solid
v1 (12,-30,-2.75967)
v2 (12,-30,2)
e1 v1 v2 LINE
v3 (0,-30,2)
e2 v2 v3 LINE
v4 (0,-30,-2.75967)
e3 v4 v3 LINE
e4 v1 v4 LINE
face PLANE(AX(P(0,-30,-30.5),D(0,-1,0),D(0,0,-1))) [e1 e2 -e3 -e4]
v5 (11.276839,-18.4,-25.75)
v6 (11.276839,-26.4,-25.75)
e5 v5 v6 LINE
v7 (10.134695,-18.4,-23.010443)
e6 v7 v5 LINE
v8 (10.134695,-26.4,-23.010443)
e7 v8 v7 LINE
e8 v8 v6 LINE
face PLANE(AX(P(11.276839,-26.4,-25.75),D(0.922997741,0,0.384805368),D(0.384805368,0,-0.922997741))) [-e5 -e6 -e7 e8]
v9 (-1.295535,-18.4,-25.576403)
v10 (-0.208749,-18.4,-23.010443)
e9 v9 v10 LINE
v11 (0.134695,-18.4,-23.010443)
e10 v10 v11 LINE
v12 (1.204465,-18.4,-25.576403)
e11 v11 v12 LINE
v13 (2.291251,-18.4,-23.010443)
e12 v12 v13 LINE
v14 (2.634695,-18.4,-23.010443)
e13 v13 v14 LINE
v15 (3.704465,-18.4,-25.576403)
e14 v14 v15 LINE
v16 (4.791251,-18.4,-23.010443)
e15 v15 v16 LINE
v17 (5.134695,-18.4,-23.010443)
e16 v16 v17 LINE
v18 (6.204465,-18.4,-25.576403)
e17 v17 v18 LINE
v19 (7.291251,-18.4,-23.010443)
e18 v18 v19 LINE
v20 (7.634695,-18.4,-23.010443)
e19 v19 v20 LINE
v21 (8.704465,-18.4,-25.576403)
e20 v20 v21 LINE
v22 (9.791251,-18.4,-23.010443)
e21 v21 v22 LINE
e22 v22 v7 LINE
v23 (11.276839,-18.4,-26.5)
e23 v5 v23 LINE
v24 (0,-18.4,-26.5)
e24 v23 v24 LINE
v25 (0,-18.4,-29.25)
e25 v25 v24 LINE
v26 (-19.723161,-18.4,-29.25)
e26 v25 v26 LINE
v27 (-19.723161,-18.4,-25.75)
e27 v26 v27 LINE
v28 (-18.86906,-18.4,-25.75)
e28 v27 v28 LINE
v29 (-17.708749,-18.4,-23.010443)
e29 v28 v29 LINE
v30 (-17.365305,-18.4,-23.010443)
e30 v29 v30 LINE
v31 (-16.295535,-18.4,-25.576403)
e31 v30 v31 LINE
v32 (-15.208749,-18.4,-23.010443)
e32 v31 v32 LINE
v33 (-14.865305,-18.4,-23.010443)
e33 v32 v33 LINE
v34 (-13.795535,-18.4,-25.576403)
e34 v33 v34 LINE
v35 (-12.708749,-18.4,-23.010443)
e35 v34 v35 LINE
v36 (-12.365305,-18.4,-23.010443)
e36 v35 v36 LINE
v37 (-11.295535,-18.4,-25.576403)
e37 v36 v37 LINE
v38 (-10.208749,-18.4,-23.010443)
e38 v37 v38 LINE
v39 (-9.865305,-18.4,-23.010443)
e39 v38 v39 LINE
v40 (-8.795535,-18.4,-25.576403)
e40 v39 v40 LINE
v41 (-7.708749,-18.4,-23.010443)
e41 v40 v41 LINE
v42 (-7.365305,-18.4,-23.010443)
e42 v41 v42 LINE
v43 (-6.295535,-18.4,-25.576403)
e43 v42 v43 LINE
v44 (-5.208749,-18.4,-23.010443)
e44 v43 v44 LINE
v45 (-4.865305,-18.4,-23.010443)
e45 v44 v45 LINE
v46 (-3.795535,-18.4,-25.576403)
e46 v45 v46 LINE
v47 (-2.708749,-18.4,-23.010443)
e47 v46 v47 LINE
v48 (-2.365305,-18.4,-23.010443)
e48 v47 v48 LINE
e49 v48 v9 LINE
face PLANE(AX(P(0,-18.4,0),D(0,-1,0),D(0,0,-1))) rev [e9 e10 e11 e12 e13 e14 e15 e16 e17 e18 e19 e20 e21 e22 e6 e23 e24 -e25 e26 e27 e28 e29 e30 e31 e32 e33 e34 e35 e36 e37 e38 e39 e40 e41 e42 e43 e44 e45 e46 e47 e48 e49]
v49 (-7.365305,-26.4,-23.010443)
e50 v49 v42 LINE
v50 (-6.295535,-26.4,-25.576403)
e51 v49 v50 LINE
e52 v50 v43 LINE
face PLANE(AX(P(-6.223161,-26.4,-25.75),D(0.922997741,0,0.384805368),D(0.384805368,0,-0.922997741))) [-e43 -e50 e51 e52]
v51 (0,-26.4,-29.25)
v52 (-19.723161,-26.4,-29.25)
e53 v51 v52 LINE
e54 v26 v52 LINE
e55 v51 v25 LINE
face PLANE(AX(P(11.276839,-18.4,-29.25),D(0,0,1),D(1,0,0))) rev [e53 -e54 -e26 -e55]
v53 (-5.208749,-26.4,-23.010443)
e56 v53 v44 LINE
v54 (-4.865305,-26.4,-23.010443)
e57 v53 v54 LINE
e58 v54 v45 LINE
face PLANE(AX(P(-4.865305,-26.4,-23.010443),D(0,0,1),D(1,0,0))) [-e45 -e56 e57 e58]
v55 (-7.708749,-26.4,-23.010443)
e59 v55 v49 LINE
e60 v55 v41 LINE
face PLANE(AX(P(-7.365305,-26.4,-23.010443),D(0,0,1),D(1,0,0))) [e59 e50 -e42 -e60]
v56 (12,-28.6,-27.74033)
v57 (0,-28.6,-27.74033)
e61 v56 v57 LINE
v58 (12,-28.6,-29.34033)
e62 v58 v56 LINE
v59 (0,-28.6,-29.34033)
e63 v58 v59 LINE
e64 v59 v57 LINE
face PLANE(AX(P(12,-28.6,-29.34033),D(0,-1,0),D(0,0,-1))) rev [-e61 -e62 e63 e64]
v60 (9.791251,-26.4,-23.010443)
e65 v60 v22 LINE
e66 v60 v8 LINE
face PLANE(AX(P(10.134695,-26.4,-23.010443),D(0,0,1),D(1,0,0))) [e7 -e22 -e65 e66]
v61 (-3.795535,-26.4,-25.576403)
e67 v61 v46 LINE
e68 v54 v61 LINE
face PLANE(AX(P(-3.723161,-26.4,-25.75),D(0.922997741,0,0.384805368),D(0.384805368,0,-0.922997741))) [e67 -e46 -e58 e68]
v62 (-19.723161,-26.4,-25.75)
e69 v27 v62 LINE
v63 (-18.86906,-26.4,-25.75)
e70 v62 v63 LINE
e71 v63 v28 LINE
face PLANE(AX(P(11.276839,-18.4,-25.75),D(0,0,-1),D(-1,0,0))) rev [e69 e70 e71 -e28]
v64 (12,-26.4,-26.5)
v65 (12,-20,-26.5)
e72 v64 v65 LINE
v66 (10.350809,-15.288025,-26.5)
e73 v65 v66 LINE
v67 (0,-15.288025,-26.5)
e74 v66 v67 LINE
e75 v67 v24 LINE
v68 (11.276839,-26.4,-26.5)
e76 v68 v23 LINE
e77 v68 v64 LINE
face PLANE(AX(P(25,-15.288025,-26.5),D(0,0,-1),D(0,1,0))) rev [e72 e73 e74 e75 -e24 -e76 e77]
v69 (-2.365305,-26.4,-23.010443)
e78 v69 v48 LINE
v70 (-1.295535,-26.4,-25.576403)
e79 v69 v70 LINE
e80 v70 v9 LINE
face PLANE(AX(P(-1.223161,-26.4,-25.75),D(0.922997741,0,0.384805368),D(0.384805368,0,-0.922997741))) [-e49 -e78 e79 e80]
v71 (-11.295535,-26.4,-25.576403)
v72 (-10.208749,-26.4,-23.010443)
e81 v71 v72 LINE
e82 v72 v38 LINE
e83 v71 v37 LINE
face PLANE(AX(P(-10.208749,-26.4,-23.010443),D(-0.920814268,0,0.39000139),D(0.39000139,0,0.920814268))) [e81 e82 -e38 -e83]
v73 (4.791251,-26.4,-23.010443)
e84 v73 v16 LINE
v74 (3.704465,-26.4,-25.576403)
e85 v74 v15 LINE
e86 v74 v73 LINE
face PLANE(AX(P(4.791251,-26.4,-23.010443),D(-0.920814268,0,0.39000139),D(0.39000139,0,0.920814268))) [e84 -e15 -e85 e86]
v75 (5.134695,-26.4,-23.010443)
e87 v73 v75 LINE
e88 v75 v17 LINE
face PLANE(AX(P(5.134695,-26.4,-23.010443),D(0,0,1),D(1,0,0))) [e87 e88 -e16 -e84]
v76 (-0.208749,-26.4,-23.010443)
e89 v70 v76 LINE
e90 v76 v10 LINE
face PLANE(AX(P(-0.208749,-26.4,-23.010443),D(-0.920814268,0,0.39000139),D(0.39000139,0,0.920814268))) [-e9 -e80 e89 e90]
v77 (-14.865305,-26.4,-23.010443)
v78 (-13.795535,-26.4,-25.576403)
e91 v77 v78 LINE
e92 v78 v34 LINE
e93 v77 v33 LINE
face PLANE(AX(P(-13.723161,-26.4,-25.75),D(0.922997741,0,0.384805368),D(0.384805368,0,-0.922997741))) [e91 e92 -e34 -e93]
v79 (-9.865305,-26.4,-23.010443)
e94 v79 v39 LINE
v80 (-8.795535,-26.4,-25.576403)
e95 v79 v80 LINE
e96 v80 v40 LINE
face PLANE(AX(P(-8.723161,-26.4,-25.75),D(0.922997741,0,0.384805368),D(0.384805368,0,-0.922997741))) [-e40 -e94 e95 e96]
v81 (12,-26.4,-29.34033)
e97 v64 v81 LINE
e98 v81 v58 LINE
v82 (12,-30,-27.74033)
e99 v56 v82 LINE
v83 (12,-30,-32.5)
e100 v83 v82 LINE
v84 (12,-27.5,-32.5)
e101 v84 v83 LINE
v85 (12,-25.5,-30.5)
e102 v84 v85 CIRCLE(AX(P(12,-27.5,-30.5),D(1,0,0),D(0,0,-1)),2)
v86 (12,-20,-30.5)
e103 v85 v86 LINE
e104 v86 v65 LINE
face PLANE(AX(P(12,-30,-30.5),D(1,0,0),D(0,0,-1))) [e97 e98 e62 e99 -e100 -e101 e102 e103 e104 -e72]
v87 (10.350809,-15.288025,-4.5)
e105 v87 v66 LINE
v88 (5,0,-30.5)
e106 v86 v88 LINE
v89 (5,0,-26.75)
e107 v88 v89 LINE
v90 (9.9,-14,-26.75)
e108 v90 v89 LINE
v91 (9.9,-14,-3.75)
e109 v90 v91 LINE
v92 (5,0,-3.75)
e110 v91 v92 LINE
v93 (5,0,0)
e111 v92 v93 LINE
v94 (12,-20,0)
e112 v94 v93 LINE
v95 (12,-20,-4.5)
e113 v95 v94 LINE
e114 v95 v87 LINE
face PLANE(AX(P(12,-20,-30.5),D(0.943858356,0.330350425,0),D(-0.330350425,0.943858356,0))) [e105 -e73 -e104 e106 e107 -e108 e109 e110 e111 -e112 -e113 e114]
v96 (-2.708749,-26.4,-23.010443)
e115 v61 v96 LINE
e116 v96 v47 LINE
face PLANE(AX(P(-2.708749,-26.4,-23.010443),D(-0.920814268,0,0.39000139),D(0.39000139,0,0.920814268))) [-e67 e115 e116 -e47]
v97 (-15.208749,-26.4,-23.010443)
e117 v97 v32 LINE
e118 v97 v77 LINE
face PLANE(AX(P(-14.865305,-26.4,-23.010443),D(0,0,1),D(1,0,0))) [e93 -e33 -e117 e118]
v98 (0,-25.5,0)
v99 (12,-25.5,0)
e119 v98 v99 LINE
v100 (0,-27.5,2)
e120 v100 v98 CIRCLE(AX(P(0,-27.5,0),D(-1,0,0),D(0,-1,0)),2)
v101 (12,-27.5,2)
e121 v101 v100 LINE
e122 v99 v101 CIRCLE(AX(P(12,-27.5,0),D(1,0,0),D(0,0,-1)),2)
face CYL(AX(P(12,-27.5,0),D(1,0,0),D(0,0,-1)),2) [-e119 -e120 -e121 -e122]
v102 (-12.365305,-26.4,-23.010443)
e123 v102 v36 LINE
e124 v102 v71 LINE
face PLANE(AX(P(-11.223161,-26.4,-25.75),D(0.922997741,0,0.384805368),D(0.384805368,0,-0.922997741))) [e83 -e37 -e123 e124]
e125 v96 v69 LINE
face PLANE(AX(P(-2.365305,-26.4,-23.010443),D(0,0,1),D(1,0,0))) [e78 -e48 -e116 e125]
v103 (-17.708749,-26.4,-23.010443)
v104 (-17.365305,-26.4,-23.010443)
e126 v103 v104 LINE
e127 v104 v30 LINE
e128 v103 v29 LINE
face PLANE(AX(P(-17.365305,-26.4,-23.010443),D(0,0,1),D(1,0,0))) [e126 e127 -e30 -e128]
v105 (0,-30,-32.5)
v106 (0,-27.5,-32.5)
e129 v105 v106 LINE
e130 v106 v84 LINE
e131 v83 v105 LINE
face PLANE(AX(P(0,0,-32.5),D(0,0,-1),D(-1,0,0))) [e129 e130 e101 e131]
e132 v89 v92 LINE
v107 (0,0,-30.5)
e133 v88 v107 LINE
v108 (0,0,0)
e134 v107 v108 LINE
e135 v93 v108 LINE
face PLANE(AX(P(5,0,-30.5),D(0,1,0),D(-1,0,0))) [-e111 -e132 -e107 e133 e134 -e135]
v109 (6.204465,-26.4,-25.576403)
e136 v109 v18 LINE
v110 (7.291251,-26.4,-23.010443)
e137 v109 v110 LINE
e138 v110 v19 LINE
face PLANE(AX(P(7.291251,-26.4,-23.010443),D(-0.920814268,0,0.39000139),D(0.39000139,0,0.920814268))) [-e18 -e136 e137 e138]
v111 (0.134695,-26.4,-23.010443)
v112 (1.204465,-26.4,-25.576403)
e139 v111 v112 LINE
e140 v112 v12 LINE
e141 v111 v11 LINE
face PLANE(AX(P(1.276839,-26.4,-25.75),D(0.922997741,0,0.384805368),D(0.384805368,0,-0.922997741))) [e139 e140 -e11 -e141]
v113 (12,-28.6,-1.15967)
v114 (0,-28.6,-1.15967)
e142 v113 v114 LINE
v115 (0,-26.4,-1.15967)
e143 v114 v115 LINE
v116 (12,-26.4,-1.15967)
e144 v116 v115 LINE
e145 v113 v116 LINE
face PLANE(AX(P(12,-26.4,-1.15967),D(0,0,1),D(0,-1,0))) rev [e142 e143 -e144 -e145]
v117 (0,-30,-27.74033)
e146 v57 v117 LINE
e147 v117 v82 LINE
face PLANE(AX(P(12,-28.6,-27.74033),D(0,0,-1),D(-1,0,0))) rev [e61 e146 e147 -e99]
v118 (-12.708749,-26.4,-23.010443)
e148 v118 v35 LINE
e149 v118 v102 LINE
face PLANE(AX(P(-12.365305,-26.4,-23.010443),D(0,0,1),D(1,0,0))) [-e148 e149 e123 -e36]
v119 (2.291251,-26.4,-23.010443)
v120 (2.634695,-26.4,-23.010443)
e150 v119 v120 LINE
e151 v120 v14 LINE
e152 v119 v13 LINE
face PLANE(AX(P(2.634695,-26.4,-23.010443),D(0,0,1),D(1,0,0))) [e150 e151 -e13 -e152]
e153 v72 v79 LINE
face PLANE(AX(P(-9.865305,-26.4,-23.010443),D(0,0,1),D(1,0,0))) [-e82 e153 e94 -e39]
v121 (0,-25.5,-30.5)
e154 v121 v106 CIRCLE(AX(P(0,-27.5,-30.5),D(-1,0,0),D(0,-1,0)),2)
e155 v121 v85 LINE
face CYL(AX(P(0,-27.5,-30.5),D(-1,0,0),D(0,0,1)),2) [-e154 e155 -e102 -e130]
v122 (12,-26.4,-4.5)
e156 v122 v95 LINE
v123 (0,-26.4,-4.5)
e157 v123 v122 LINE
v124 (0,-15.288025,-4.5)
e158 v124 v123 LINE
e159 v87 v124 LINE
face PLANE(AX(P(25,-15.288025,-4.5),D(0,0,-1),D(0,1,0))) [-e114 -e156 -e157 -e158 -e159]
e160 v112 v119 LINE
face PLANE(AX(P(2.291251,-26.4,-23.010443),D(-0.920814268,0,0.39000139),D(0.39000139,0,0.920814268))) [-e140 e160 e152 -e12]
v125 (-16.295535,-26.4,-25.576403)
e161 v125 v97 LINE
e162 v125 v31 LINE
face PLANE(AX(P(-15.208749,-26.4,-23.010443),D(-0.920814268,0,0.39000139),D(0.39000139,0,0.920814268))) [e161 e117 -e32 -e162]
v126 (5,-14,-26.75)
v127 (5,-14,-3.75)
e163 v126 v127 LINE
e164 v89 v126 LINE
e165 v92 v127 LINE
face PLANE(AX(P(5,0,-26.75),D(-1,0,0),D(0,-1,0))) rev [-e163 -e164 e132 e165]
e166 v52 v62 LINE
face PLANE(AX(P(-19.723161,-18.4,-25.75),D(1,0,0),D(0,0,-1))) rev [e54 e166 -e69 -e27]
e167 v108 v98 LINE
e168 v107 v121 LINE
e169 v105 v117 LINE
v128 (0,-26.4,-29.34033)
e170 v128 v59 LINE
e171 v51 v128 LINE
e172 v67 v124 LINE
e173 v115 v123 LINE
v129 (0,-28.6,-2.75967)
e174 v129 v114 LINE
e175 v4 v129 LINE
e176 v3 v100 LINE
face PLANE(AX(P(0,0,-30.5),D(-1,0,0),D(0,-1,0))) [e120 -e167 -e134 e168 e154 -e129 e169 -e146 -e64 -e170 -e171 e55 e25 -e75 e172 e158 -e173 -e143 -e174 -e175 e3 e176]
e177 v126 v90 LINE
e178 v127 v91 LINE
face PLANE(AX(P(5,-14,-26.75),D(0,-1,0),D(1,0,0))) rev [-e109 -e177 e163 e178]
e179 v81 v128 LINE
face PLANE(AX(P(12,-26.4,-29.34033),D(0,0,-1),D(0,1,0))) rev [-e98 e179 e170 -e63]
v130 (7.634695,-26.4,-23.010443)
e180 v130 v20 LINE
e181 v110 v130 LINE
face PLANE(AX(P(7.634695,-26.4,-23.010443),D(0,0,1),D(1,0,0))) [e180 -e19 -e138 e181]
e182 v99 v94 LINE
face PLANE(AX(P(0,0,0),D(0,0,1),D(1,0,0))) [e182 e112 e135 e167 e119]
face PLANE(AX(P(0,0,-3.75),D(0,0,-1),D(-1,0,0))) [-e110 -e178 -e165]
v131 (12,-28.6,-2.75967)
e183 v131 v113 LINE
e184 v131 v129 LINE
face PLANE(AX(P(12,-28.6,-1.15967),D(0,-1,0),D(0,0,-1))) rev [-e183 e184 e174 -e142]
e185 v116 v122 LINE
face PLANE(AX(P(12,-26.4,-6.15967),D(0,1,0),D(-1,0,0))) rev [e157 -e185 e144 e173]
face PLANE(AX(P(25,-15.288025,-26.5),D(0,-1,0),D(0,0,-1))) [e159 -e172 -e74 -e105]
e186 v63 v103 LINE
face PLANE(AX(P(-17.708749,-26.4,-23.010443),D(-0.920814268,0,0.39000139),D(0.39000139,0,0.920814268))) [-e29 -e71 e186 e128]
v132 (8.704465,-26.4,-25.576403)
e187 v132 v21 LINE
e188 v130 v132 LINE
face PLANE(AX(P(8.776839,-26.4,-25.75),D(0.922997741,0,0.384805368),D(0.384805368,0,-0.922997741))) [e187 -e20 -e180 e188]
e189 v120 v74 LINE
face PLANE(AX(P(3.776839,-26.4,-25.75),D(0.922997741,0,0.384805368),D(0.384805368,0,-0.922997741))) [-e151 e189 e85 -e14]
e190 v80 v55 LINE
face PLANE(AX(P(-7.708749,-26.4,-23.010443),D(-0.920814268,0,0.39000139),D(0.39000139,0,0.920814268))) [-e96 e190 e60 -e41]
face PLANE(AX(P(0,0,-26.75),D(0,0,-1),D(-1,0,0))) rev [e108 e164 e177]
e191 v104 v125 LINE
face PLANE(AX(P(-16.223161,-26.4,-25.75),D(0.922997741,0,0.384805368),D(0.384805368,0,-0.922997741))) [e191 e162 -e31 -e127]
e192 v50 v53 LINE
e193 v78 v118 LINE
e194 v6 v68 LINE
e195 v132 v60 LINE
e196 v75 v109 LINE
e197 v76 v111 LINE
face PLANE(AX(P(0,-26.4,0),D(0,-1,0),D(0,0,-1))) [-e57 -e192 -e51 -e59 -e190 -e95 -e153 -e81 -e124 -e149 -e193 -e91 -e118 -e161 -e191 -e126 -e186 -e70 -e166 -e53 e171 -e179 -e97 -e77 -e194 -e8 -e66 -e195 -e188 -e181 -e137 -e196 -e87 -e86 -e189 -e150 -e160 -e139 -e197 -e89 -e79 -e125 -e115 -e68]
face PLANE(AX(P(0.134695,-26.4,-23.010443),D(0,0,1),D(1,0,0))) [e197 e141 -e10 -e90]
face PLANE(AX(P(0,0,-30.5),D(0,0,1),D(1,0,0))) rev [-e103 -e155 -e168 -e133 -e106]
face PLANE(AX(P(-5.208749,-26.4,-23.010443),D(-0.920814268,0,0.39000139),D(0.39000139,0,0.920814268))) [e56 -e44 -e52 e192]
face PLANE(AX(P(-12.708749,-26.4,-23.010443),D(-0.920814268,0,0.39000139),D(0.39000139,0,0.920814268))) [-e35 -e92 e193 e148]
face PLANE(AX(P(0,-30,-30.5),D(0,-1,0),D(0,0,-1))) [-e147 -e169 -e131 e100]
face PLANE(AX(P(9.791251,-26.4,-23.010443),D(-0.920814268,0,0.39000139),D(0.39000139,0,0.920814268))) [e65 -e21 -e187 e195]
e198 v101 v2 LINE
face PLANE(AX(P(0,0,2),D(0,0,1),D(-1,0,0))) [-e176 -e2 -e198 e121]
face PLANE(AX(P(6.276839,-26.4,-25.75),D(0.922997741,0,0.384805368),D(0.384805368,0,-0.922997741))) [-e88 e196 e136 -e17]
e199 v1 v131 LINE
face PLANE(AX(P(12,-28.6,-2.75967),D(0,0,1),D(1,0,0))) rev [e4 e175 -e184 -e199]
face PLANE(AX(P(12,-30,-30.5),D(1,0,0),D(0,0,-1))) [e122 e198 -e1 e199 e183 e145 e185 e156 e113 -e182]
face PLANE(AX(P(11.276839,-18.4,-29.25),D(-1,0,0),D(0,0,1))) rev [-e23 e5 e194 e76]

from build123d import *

# Parameters (mm, degrees)
BOSS_EXTRUDE1_DEPTH = 30.5
SKETCH4_W           = 22
SKETCH4_H           = 15
CUT_EXTRUDE2_DEPTH  = 25
CUT_EXTRUDE4_DEPTH  = 11.5
SKETCH7_W           = 31
SKETCH7_H           = 3.5
BOSS_EXTRUDE3_DEPTH = 8
BOSS_EXTRUDE4_START = -8
BOSS_EXTRUDE4_DEPTH = 8
LPATTERN1_COUNT     = 12
LPATTERN1_PITCH     = 2.5
SKETCH11_W          = 12
SKETCH11_H          = 4.5
BOSS_EXTRUDE5_DEPTH = 2
FILLET1_R           = 2
FILLET2_R           = 2
CUT_EXTRUDE5_DEPTH  = 49.427812959


with BuildPart() as part:
    # Sketch1 → Boss-Extrude1 (new body)
    with BuildSketch(Plane.XY):
        Polygon((0, 0), (0, -30), (12, -30), (12, -20), (5, 0), align=None)
    extrude(amount=-BOSS_EXTRUDE1_DEPTH)

    # Sketch4 → Cut-Extrude2 (cut)
    with BuildSketch(Plane.ZY):
        with Locations((-15.5, -22.788025353)):
            Rectangle(SKETCH4_W, SKETCH4_H)
    extrude(amount=-CUT_EXTRUDE2_DEPTH, mode=Mode.SUBTRACT)

    # Sketch6 → Cut-Extrude4 (cut, symmetric)
    with BuildSketch(Plane.XY.offset(-15.25)):
        Polygon((5, 0), (5, -14), (9.9, -14), align=None)
    extrude(amount=CUT_EXTRUDE4_DEPTH, both=True, mode=Mode.SUBTRACT)

    # Sketch7 → Boss-Extrude3 (add)
    with BuildSketch(Plane(origin=(0, -26.4, 0), x_dir=(1, 0, 0), z_dir=(0, 1, 0))):
        with Locations((-4.2231607, 27.5)):
            Rectangle(SKETCH7_W, SKETCH7_H)
    extrude(amount=BOSS_EXTRUDE3_DEPTH)

    # Sketch10 → Boss-Extrude4 (add)
    with BuildSketch(Plane(origin=(0, -18.4, 0), x_dir=(1, 0, 0), z_dir=(0, 1, 0)).offset(BOSS_EXTRUDE4_START)):
        Polygon((11.2768393, 25.75), (10.134695379, 23.01044295), (9.791251241, 23.01044295), (8.630940097, 25.75), align=None)
    boss_extrude4 = extrude(amount=BOSS_EXTRUDE4_DEPTH)

    # LPattern1: Boss-Extrude4 ×12
    with Locations(*[(-i * LPATTERN1_PITCH, 0, 0) for i in range(1, LPATTERN1_COUNT)]):
        add(boss_extrude4)

    # Sketch11 → Boss-Extrude5 (add)
    with BuildSketch(Plane(origin=(0, 0, -30.5), x_dir=(-1, 0, 0), z_dir=(0, 0, -1))):
        with Locations((-6, -27.75)):
            Rectangle(SKETCH11_W, SKETCH11_H)
    boss_extrude5 = extrude(amount=BOSS_EXTRUDE5_DEPTH)

    # Fillet1
    fillet1_edges = [part.edges().sort_by_distance(p)[0] for p in [
        (6, -25.5, -32.5),
    ]]
    fillet(fillet1_edges, radius=FILLET1_R - 0.0001)  # a hair under: the kernel refuses the full size

    # Mirror1: Boss-Extrude5 across plane
    add(boss_extrude5.mirror(Plane.XY.offset(-15.25)))

    # Fillet2
    fillet2_edges = [part.edges().sort_by_distance(p)[0] for p in [
        (6, -25.5, 2),
    ]]
    fillet(fillet2_edges, radius=FILLET2_R - 0.0001)  # a hair under: the kernel refuses the full size

    # Sketch9 → Cut-Extrude5 (cut, through all)
    with BuildSketch(Plane.ZY):
        Polygon((-6.15967028, -26.4), (-1.15967028, -26.4), (-1.15967028, -28.6), (-2.75967028, -28.6), (-2.75967028, -30.296685761), (-6.15967028, -30.296685761), align=None)
        Polygon((-27.74032972, -30.296685761), (-24.34032972, -30.296685761), (-24.34032972, -26.4), (-29.34032972, -26.4), (-29.34032972, -28.6), (-27.74032972, -28.6), align=None)
    extrude(amount=-CUT_EXTRUDE5_DEPTH, mode=Mode.SUBTRACT)


solid = part.part
